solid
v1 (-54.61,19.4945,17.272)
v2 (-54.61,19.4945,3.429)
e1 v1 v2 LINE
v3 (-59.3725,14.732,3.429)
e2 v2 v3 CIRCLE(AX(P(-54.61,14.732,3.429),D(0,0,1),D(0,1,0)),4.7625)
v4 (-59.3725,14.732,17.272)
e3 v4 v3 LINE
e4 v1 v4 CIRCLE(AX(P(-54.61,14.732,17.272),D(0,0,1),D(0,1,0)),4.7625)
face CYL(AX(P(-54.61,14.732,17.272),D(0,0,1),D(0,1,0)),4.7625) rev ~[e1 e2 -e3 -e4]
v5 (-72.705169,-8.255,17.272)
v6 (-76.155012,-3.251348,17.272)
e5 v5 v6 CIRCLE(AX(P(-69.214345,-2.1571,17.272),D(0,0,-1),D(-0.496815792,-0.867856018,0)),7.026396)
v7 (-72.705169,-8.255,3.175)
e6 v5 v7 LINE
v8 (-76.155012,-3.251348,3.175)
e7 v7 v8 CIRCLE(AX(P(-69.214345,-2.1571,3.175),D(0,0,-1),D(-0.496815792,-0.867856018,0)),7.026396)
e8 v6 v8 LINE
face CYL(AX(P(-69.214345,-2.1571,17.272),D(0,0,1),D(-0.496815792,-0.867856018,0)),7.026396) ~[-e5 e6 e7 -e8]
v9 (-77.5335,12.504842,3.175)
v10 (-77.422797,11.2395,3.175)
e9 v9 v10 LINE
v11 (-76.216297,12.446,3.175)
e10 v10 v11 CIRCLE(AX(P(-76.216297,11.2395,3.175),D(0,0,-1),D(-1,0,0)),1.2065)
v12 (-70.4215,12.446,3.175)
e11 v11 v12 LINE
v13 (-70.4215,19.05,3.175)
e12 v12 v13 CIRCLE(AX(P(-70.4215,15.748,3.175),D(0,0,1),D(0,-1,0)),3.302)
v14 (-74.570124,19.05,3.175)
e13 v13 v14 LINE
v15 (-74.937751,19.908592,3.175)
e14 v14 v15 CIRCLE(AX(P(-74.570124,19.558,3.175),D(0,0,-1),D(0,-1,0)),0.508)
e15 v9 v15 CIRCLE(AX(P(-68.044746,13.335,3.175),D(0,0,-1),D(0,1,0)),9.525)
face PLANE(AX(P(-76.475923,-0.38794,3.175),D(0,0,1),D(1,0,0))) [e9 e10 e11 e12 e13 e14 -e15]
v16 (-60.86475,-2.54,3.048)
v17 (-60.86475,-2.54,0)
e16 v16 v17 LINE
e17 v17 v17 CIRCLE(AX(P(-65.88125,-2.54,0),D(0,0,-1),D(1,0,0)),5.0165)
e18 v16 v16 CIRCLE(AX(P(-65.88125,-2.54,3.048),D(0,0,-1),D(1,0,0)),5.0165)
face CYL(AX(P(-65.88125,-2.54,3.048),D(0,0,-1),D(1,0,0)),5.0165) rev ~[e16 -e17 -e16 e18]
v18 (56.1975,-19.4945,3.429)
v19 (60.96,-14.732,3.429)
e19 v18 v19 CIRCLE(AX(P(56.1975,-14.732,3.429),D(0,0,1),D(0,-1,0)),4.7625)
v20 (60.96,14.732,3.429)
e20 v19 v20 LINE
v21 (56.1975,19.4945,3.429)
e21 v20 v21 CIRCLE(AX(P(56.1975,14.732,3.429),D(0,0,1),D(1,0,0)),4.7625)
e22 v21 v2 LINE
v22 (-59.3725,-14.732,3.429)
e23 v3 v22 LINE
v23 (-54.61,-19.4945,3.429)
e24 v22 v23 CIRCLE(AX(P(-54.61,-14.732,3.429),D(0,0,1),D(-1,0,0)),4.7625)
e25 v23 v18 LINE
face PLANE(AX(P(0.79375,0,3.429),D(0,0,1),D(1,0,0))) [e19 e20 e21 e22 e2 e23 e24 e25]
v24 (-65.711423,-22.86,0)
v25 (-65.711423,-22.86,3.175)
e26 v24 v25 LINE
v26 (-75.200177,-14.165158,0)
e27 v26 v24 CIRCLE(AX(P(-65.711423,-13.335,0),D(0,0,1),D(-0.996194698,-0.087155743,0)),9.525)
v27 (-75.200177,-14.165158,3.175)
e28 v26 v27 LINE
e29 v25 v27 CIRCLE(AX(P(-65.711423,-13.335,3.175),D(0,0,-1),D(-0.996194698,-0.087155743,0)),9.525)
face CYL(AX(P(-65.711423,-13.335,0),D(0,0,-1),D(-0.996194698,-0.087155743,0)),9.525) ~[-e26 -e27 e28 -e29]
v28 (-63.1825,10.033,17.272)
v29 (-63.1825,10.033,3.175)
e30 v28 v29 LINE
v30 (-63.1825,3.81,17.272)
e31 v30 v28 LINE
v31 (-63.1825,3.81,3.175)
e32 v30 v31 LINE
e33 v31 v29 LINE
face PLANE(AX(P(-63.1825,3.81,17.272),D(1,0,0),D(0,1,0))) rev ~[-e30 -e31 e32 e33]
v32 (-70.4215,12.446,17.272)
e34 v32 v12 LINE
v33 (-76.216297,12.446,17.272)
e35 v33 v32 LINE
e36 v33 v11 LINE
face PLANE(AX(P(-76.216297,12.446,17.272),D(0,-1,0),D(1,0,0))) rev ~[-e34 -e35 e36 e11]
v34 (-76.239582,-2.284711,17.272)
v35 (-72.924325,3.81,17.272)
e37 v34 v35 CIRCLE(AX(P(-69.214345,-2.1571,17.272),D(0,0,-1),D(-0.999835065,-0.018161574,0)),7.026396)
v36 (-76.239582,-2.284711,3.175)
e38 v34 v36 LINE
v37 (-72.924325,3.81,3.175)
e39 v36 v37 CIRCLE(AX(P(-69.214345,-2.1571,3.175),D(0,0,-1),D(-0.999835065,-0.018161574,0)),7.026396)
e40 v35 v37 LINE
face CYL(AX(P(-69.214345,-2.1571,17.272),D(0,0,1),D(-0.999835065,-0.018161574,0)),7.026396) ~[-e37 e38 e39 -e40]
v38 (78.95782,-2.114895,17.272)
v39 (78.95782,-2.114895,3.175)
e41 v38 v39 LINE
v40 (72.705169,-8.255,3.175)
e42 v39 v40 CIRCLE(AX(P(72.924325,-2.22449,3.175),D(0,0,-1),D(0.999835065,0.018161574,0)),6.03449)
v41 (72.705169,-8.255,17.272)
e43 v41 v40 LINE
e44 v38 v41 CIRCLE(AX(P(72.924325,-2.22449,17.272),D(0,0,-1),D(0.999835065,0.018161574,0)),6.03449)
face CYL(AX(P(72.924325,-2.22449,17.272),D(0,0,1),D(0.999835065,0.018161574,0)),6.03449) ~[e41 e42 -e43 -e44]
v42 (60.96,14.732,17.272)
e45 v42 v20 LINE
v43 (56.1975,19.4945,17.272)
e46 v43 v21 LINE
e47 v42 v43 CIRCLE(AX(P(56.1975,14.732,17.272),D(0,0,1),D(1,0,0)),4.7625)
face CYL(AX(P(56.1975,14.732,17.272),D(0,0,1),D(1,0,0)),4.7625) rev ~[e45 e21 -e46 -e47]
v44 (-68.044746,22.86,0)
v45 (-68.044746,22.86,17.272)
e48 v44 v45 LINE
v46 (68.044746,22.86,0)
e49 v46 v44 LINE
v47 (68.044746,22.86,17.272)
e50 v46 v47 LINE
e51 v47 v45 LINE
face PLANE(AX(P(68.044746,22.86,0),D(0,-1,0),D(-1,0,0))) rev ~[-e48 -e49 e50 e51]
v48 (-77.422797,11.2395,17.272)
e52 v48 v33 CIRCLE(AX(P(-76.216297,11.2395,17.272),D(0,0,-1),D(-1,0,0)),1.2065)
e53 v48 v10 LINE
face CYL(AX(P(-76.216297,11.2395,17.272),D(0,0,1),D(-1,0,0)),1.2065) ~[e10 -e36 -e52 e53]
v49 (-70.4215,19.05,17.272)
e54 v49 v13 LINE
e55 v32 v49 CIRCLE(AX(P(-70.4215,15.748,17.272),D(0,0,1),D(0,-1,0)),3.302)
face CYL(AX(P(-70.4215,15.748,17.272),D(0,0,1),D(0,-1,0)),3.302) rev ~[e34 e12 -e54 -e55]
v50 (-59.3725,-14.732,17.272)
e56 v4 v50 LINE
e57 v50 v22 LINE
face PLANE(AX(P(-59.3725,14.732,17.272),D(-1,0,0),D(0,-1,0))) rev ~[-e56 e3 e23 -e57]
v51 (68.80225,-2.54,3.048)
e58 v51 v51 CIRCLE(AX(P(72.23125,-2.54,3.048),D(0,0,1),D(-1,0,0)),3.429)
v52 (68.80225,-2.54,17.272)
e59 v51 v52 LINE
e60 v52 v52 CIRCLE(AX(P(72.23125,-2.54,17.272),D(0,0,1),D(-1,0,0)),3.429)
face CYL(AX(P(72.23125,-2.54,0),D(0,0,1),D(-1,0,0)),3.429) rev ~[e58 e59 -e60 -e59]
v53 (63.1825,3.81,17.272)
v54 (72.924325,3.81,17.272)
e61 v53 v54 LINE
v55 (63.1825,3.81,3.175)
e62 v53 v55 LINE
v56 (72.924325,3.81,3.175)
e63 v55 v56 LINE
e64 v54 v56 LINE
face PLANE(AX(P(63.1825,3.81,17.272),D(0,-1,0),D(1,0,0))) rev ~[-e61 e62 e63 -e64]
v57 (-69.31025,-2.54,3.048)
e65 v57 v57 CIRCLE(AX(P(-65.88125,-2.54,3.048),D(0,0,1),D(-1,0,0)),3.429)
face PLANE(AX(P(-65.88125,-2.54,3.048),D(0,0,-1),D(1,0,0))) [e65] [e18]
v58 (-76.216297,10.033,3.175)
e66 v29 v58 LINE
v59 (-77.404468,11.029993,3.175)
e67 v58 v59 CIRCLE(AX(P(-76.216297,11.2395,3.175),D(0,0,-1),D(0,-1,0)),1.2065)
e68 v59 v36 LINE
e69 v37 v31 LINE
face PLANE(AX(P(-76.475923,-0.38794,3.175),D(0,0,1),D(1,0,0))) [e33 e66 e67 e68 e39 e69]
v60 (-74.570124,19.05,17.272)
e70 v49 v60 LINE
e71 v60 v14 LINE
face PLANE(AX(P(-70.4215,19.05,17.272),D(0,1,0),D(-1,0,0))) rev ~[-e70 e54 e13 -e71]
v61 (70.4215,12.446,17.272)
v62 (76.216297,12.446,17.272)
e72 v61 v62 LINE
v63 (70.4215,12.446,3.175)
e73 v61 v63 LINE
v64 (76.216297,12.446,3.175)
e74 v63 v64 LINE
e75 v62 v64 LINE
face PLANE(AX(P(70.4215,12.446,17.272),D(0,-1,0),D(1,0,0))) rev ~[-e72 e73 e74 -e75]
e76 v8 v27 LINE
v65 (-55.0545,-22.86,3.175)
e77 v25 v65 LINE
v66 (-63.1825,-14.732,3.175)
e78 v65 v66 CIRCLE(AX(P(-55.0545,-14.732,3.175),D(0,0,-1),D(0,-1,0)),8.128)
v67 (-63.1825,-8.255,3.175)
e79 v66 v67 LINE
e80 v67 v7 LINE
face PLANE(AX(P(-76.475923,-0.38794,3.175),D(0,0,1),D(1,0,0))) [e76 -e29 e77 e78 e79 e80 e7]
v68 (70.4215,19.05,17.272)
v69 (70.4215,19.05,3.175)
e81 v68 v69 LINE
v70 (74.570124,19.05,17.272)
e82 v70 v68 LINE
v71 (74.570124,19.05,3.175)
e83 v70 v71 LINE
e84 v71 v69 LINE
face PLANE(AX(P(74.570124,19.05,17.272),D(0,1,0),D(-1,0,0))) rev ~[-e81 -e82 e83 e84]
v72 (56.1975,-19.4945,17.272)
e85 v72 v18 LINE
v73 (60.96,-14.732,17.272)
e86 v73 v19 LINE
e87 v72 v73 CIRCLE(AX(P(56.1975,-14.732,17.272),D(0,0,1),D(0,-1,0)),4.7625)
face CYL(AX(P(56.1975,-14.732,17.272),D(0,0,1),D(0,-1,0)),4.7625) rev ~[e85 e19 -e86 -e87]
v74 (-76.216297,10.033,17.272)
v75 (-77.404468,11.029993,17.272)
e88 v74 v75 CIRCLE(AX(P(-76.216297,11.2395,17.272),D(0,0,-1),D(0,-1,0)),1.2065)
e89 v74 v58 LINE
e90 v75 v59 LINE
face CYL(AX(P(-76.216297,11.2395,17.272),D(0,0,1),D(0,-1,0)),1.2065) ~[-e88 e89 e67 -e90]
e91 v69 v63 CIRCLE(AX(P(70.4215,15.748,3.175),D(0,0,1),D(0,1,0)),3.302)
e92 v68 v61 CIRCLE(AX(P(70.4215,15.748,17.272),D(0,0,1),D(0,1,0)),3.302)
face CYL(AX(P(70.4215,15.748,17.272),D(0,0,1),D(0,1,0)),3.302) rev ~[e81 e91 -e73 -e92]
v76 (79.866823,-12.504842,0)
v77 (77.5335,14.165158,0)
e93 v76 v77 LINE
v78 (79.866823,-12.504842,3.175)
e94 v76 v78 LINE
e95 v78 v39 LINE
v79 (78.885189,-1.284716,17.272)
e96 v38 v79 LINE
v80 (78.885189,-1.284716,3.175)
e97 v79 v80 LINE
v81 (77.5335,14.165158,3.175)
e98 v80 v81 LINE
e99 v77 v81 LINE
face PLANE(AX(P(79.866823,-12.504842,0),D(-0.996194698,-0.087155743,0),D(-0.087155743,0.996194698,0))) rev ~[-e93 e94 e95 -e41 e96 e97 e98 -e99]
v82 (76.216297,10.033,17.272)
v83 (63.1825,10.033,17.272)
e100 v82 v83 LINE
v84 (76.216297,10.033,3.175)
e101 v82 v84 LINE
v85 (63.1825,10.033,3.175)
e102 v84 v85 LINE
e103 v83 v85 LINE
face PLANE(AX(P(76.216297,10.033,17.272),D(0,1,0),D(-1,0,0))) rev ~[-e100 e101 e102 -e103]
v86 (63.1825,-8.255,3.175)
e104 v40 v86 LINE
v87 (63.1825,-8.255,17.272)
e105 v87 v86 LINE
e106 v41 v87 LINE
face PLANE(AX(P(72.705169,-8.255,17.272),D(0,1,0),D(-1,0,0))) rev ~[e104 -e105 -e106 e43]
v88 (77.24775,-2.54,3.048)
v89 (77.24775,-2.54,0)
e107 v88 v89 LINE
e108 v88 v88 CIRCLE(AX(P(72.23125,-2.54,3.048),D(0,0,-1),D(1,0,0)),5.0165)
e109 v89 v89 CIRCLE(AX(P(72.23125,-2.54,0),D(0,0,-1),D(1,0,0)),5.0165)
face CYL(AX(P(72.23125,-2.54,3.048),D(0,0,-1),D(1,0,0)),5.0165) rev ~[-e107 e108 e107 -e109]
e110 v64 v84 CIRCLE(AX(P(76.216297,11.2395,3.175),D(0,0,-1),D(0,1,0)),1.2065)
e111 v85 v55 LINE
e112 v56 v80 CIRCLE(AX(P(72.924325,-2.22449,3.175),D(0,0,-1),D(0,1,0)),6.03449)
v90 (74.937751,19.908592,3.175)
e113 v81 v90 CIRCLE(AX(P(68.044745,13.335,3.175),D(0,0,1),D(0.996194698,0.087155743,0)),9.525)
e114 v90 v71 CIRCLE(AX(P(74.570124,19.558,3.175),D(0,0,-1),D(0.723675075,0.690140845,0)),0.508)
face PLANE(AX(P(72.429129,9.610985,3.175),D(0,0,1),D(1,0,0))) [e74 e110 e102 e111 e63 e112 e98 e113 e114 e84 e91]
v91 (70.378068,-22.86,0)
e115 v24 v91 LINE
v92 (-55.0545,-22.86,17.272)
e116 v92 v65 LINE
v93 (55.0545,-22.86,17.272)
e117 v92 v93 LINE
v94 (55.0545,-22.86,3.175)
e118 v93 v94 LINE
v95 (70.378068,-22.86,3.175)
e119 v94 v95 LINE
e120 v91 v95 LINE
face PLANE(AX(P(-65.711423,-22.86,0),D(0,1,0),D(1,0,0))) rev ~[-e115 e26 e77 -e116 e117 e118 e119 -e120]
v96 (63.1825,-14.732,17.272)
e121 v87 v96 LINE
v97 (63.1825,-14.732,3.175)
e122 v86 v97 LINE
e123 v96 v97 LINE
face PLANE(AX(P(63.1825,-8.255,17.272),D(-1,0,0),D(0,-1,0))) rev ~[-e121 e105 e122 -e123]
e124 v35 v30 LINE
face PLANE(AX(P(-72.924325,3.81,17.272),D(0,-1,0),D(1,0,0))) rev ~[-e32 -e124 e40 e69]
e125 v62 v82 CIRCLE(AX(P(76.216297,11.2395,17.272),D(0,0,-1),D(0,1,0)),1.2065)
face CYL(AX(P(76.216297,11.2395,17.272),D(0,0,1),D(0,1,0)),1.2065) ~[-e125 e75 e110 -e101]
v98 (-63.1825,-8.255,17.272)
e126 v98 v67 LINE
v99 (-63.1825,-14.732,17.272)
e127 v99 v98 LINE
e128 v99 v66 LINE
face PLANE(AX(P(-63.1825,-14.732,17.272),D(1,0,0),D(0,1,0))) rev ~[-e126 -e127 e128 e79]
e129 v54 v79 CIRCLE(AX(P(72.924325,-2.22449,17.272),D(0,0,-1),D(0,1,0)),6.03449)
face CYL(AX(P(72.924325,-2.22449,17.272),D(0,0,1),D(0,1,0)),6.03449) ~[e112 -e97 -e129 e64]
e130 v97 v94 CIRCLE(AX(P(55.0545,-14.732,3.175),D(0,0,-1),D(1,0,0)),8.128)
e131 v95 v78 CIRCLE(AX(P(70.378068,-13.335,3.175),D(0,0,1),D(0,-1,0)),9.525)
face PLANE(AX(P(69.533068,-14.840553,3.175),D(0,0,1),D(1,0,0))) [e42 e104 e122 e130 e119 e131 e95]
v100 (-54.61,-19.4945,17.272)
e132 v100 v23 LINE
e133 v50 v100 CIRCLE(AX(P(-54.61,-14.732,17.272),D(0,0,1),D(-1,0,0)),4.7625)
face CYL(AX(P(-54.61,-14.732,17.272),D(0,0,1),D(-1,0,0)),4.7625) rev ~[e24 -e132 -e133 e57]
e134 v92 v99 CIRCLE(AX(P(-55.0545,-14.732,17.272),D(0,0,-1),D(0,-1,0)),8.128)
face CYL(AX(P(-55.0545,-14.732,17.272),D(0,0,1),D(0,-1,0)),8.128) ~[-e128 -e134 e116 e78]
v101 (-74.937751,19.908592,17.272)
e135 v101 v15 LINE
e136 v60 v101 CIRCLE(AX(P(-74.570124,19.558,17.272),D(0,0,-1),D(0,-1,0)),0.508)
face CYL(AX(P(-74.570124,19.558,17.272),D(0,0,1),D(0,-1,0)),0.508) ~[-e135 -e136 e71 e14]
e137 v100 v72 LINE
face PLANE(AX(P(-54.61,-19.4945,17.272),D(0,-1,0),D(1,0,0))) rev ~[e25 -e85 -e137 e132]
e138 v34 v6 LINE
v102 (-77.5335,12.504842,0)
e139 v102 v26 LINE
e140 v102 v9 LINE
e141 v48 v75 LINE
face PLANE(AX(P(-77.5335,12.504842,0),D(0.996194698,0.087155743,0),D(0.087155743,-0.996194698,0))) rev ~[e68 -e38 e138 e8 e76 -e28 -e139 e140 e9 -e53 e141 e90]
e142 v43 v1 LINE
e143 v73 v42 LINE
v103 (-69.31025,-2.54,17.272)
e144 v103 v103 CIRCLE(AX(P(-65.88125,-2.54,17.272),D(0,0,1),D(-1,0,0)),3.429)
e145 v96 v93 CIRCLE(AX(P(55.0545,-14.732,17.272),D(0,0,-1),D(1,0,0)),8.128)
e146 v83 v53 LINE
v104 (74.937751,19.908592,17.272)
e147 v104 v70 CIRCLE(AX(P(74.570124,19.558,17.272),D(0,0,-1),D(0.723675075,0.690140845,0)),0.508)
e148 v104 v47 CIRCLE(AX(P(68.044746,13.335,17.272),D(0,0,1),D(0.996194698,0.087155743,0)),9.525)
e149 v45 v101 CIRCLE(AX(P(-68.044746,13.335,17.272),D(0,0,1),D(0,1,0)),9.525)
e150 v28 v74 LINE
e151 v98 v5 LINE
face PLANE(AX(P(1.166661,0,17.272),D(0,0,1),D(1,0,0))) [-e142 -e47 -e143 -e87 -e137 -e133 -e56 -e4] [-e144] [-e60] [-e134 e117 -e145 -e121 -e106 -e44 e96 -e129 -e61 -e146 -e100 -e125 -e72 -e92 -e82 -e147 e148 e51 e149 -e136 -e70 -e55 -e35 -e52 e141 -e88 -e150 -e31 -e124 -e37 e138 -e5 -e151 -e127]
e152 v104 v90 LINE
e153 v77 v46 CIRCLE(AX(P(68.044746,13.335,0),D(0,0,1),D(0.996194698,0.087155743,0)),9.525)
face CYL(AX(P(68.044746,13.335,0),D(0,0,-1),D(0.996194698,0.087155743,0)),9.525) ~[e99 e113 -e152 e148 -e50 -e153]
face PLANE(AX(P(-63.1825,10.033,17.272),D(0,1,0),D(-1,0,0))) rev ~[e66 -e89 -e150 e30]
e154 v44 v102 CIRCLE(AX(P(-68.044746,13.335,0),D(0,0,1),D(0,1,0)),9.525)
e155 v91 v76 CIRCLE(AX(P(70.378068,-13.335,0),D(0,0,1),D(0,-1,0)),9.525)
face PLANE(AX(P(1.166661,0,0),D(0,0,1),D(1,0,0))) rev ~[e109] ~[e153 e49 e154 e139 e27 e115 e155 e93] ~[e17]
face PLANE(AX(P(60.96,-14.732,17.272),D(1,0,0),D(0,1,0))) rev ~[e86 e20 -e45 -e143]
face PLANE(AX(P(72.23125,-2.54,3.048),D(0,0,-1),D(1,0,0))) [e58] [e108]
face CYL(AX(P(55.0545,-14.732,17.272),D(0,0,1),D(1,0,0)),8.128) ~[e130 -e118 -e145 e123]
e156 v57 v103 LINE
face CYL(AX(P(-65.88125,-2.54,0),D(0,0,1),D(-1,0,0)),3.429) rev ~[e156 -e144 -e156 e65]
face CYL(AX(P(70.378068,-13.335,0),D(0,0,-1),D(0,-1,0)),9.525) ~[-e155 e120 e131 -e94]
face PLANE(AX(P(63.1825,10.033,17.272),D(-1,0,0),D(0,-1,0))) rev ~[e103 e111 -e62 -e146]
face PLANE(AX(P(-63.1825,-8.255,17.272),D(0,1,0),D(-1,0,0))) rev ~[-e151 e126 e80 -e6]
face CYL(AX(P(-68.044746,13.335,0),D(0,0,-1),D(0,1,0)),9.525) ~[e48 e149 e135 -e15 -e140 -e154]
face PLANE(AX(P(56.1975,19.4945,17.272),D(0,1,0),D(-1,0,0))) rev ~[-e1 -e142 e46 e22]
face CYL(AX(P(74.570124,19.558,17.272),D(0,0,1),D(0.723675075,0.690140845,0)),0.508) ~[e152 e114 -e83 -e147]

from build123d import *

# Parameters (mm, degrees)
F1_DEPTH       = 17.272
F3_DEPTH       = 13.843
F5_DEPTH       = 14.097
F7_D           = 6.858
F7_CBORE_D     = 10.033
F7_CBORE_DEPTH = 3.048


# Not quite as in the source:
# - a feature names something its author has since deleted; it is built from what else it names


with BuildPart() as f1:
    # F0 (on Top) → F1 (new body)
    with BuildSketch(Plane.XY):
        with BuildLine():
            Line((68.0447455007, 22.86), (-68.0447455007, 22.86))
            ThreePointArc((-68.0447455007, 22.86), (-75.0673121338, 19.7699967275), (-77.5335, 12.5048415503))
            Line((-77.5335, 12.5048415503), (-75.2001773438, -14.1651584497))
            ThreePointArc((-75.2001773438, -14.1651584497), (-72.146419572, -20.3575666331), (-65.7114228444, -22.86))
            Line((-65.7114228444, -22.86), (70.3780681569, -22.86))
            ThreePointArc((70.3780681569, -22.86), (77.40063479, -19.7699967275), (79.8668226562, -12.5048415503))
            Line((79.8668226562, -12.5048415503), (77.5335, 14.1651584497))
            ThreePointArc((77.5335, 14.1651584497), (74.4797422282, 20.3575666331), (68.0447455007, 22.86))
        make_face()
    extrude(amount=F1_DEPTH)

    # F2 (on face) → F3 (cut)
    with BuildSketch(Plane.XY.offset(17.272)):
        with BuildLine():
            Line((56.1975, 19.4945), (-54.61, 19.4945))
            ThreePointArc((-54.61, 19.4945), (-57.9775960454, 18.0995960454), (-59.3725, 14.732))
            Line((-59.3725, 14.732), (-59.3725, -14.732))
            ThreePointArc((-59.3725, -14.732), (-57.9775960454, -18.0995960454), (-54.61, -19.4945))
            Line((-54.61, -19.4945), (56.1975, -19.4945))
            ThreePointArc((56.1975, -19.4945), (59.5650960454, -18.0995960454), (60.96, -14.732))
            Line((60.96, -14.732), (60.96, 14.732))
            ThreePointArc((60.96, 14.732), (59.5650960454, 18.0995960454), (56.1975, 19.4945))
        make_face()
    extrude(amount=-F3_DEPTH, mode=Mode.SUBTRACT)

    # F4 (on face) → F5 (cut)
    with BuildSketch(Plane.XY.offset(17.272)):
        with BuildLine():
            Line((-76.239581844, -2.2847106486), (-77.4044675129, 11.0299934736))
            ThreePointArc((-77.4044675129, 11.0299934736), (-77.4182058621, 11.1343465964), (-77.4227969589, 11.2395))
            Line((-77.4227969589, 11.2395), (-77.5335, 12.5048415503))
            ThreePointArc((-77.5335, 12.5048415503), (-77.0333154818, 16.4863861544), (-74.9377505887, 19.9085915493))
            ThreePointArc((-74.9377505887, 19.9085915493), (-71.7938897692, 22.0911145638), (-68.0447455007, 22.86))
            Line((-68.0447455007, 22.86), (-80.5285722017, 22.86))
            Line((-80.5285722017, 22.86), (-80.5285722017, -22.86))
            Line((-80.5285722017, -22.86), (-65.7114228444, -22.86))
            ThreePointArc((-65.7114228444, -22.86), (-72.146419572, -20.3575666331), (-75.2001773438, -14.1651584497))
            Line((-75.2001773438, -14.1651584497), (-76.1550120261, -3.2513480896))
            ThreePointArc((-76.1550120261, -3.2513480896), (-76.2140031856, -2.7694909766), (-76.239581844, -2.2847106486))
        make_face()
        with BuildLine():
            Line((-77.5335, 12.5048415503), (-77.4227969589, 11.2395))
            ThreePointArc((-77.4227969589, 11.2395), (-77.0694212904, 12.0926243315), (-76.2162969589, 12.446))
            Line((-76.2162969589, 12.446), (-70.4215, 12.446))
            ThreePointArc((-70.4215, 12.446), (-67.1195, 15.748), (-70.4215, 19.05))
            Line((-70.4215, 19.05), (-74.5701236506, 19.05))
            ThreePointArc((-74.5701236506, 19.05), (-75.0371164274, 19.358045639), (-74.9377505887, 19.9085915493))
            ThreePointArc((-74.9377505887, 19.9085915493), (-77.0333154818, 16.4863861544), (-77.5335, 12.5048415503))
        make_face()
        with BuildLine():
            Line((-63.1825, 3.81), (-63.1825, 10.033))
            Line((-63.1825, 10.033), (-76.2162969589, 10.033))
            ThreePointArc((-76.2162969589, 10.033), (-76.9918202099, 10.3152673794), (-77.4044675129, 11.0299934736))
            Line((-77.4044675129, 11.0299934736), (-76.239581844, -2.2847106486))
            ThreePointArc((-76.239581844, -2.2847106486), (-75.3866698867, 1.2003753653), (-72.9243249481, 3.81))
            Line((-72.9243249481, 3.81), (-63.1825, 3.81))
        make_face()
        with BuildLine():
            ThreePointArc((-72.7051694123, -8.255), (-74.9990780637, -6.1454708758), (-76.1550120261, -3.2513480896))
            Line((-76.1550120261, -3.2513480896), (-75.2001773438, -14.1651584497))
            ThreePointArc((-75.2001773438, -14.1651584497), (-72.146419572, -20.3575666331), (-65.7114228444, -22.86))
            Line((-65.7114228444, -22.86), (-55.0545, -22.86))
            ThreePointArc((-55.0545, -22.86), (-60.8018639175, -20.4793639175), (-63.1825, -14.732))
            Line((-63.1825, -14.732), (-63.1825, -8.255))
            Line((-63.1825, -8.255), (-72.7051694123, -8.255))
        make_face()
        with BuildLine():
            ThreePointArc((63.1825, -14.732), (60.8018639175, -20.4793639175), (55.0545, -22.86))
            Line((55.0545, -22.86), (70.3780681569, -22.86))
            ThreePointArc((70.3780681569, -22.86), (77.40063479, -19.7699967275), (79.8668226562, -12.5048415503))
            Line((79.8668226562, -12.5048415503), (78.9578200825, -2.114894589))
            ThreePointArc((78.9578200825, -2.114894589), (77.1524285249, -6.5300931701), (72.7051694123, -8.255))
            Line((72.7051694123, -8.255), (63.1825, -8.255))
            Line((63.1825, -8.255), (63.1825, -14.732))
        make_face()
        with BuildLine():
            ThreePointArc((77.5335, 14.1651584497), (76.7244498583, 17.2577996716), (74.9377505887, 19.9085915493))
            ThreePointArc((74.9377505887, 19.9085915493), (75.0371164274, 19.358045639), (74.5701236506, 19.05))
            Line((74.5701236506, 19.05), (70.4215, 19.05))
            ThreePointArc((70.4215, 19.05), (67.1195, 15.748), (70.4215, 12.446))
            Line((70.4215, 12.446), (76.2162969589, 12.446))
            ThreePointArc((76.2162969589, 12.446), (77.4227969589, 11.2395), (76.2162969589, 10.033))
            Line((76.2162969589, 10.033), (63.1825, 10.033))
            Line((63.1825, 10.033), (63.1825, 3.81))
            Line((63.1825, 3.81), (72.9243249481, 3.81))
            ThreePointArc((72.9243249481, 3.81), (76.8450400591, 2.3627819378), (78.8851888528, -1.2847158349))
            Line((78.8851888528, -1.2847158349), (77.5335, 14.1651584497))
        make_face()
    extrude(amount=-F5_DEPTH, mode=Mode.SUBTRACT)

    # F7 (through all)
    with Locations(Plane(origin=(0, 0, 0), x_dir=(1, 0, 0), z_dir=(0, 0, -1))):
        with Locations((72.23125, 2.54), (-65.88125, 2.54)):
            CounterBoreHole(F7_D / 2, F7_CBORE_D / 2, F7_CBORE_DEPTH)


solid = f1.part
